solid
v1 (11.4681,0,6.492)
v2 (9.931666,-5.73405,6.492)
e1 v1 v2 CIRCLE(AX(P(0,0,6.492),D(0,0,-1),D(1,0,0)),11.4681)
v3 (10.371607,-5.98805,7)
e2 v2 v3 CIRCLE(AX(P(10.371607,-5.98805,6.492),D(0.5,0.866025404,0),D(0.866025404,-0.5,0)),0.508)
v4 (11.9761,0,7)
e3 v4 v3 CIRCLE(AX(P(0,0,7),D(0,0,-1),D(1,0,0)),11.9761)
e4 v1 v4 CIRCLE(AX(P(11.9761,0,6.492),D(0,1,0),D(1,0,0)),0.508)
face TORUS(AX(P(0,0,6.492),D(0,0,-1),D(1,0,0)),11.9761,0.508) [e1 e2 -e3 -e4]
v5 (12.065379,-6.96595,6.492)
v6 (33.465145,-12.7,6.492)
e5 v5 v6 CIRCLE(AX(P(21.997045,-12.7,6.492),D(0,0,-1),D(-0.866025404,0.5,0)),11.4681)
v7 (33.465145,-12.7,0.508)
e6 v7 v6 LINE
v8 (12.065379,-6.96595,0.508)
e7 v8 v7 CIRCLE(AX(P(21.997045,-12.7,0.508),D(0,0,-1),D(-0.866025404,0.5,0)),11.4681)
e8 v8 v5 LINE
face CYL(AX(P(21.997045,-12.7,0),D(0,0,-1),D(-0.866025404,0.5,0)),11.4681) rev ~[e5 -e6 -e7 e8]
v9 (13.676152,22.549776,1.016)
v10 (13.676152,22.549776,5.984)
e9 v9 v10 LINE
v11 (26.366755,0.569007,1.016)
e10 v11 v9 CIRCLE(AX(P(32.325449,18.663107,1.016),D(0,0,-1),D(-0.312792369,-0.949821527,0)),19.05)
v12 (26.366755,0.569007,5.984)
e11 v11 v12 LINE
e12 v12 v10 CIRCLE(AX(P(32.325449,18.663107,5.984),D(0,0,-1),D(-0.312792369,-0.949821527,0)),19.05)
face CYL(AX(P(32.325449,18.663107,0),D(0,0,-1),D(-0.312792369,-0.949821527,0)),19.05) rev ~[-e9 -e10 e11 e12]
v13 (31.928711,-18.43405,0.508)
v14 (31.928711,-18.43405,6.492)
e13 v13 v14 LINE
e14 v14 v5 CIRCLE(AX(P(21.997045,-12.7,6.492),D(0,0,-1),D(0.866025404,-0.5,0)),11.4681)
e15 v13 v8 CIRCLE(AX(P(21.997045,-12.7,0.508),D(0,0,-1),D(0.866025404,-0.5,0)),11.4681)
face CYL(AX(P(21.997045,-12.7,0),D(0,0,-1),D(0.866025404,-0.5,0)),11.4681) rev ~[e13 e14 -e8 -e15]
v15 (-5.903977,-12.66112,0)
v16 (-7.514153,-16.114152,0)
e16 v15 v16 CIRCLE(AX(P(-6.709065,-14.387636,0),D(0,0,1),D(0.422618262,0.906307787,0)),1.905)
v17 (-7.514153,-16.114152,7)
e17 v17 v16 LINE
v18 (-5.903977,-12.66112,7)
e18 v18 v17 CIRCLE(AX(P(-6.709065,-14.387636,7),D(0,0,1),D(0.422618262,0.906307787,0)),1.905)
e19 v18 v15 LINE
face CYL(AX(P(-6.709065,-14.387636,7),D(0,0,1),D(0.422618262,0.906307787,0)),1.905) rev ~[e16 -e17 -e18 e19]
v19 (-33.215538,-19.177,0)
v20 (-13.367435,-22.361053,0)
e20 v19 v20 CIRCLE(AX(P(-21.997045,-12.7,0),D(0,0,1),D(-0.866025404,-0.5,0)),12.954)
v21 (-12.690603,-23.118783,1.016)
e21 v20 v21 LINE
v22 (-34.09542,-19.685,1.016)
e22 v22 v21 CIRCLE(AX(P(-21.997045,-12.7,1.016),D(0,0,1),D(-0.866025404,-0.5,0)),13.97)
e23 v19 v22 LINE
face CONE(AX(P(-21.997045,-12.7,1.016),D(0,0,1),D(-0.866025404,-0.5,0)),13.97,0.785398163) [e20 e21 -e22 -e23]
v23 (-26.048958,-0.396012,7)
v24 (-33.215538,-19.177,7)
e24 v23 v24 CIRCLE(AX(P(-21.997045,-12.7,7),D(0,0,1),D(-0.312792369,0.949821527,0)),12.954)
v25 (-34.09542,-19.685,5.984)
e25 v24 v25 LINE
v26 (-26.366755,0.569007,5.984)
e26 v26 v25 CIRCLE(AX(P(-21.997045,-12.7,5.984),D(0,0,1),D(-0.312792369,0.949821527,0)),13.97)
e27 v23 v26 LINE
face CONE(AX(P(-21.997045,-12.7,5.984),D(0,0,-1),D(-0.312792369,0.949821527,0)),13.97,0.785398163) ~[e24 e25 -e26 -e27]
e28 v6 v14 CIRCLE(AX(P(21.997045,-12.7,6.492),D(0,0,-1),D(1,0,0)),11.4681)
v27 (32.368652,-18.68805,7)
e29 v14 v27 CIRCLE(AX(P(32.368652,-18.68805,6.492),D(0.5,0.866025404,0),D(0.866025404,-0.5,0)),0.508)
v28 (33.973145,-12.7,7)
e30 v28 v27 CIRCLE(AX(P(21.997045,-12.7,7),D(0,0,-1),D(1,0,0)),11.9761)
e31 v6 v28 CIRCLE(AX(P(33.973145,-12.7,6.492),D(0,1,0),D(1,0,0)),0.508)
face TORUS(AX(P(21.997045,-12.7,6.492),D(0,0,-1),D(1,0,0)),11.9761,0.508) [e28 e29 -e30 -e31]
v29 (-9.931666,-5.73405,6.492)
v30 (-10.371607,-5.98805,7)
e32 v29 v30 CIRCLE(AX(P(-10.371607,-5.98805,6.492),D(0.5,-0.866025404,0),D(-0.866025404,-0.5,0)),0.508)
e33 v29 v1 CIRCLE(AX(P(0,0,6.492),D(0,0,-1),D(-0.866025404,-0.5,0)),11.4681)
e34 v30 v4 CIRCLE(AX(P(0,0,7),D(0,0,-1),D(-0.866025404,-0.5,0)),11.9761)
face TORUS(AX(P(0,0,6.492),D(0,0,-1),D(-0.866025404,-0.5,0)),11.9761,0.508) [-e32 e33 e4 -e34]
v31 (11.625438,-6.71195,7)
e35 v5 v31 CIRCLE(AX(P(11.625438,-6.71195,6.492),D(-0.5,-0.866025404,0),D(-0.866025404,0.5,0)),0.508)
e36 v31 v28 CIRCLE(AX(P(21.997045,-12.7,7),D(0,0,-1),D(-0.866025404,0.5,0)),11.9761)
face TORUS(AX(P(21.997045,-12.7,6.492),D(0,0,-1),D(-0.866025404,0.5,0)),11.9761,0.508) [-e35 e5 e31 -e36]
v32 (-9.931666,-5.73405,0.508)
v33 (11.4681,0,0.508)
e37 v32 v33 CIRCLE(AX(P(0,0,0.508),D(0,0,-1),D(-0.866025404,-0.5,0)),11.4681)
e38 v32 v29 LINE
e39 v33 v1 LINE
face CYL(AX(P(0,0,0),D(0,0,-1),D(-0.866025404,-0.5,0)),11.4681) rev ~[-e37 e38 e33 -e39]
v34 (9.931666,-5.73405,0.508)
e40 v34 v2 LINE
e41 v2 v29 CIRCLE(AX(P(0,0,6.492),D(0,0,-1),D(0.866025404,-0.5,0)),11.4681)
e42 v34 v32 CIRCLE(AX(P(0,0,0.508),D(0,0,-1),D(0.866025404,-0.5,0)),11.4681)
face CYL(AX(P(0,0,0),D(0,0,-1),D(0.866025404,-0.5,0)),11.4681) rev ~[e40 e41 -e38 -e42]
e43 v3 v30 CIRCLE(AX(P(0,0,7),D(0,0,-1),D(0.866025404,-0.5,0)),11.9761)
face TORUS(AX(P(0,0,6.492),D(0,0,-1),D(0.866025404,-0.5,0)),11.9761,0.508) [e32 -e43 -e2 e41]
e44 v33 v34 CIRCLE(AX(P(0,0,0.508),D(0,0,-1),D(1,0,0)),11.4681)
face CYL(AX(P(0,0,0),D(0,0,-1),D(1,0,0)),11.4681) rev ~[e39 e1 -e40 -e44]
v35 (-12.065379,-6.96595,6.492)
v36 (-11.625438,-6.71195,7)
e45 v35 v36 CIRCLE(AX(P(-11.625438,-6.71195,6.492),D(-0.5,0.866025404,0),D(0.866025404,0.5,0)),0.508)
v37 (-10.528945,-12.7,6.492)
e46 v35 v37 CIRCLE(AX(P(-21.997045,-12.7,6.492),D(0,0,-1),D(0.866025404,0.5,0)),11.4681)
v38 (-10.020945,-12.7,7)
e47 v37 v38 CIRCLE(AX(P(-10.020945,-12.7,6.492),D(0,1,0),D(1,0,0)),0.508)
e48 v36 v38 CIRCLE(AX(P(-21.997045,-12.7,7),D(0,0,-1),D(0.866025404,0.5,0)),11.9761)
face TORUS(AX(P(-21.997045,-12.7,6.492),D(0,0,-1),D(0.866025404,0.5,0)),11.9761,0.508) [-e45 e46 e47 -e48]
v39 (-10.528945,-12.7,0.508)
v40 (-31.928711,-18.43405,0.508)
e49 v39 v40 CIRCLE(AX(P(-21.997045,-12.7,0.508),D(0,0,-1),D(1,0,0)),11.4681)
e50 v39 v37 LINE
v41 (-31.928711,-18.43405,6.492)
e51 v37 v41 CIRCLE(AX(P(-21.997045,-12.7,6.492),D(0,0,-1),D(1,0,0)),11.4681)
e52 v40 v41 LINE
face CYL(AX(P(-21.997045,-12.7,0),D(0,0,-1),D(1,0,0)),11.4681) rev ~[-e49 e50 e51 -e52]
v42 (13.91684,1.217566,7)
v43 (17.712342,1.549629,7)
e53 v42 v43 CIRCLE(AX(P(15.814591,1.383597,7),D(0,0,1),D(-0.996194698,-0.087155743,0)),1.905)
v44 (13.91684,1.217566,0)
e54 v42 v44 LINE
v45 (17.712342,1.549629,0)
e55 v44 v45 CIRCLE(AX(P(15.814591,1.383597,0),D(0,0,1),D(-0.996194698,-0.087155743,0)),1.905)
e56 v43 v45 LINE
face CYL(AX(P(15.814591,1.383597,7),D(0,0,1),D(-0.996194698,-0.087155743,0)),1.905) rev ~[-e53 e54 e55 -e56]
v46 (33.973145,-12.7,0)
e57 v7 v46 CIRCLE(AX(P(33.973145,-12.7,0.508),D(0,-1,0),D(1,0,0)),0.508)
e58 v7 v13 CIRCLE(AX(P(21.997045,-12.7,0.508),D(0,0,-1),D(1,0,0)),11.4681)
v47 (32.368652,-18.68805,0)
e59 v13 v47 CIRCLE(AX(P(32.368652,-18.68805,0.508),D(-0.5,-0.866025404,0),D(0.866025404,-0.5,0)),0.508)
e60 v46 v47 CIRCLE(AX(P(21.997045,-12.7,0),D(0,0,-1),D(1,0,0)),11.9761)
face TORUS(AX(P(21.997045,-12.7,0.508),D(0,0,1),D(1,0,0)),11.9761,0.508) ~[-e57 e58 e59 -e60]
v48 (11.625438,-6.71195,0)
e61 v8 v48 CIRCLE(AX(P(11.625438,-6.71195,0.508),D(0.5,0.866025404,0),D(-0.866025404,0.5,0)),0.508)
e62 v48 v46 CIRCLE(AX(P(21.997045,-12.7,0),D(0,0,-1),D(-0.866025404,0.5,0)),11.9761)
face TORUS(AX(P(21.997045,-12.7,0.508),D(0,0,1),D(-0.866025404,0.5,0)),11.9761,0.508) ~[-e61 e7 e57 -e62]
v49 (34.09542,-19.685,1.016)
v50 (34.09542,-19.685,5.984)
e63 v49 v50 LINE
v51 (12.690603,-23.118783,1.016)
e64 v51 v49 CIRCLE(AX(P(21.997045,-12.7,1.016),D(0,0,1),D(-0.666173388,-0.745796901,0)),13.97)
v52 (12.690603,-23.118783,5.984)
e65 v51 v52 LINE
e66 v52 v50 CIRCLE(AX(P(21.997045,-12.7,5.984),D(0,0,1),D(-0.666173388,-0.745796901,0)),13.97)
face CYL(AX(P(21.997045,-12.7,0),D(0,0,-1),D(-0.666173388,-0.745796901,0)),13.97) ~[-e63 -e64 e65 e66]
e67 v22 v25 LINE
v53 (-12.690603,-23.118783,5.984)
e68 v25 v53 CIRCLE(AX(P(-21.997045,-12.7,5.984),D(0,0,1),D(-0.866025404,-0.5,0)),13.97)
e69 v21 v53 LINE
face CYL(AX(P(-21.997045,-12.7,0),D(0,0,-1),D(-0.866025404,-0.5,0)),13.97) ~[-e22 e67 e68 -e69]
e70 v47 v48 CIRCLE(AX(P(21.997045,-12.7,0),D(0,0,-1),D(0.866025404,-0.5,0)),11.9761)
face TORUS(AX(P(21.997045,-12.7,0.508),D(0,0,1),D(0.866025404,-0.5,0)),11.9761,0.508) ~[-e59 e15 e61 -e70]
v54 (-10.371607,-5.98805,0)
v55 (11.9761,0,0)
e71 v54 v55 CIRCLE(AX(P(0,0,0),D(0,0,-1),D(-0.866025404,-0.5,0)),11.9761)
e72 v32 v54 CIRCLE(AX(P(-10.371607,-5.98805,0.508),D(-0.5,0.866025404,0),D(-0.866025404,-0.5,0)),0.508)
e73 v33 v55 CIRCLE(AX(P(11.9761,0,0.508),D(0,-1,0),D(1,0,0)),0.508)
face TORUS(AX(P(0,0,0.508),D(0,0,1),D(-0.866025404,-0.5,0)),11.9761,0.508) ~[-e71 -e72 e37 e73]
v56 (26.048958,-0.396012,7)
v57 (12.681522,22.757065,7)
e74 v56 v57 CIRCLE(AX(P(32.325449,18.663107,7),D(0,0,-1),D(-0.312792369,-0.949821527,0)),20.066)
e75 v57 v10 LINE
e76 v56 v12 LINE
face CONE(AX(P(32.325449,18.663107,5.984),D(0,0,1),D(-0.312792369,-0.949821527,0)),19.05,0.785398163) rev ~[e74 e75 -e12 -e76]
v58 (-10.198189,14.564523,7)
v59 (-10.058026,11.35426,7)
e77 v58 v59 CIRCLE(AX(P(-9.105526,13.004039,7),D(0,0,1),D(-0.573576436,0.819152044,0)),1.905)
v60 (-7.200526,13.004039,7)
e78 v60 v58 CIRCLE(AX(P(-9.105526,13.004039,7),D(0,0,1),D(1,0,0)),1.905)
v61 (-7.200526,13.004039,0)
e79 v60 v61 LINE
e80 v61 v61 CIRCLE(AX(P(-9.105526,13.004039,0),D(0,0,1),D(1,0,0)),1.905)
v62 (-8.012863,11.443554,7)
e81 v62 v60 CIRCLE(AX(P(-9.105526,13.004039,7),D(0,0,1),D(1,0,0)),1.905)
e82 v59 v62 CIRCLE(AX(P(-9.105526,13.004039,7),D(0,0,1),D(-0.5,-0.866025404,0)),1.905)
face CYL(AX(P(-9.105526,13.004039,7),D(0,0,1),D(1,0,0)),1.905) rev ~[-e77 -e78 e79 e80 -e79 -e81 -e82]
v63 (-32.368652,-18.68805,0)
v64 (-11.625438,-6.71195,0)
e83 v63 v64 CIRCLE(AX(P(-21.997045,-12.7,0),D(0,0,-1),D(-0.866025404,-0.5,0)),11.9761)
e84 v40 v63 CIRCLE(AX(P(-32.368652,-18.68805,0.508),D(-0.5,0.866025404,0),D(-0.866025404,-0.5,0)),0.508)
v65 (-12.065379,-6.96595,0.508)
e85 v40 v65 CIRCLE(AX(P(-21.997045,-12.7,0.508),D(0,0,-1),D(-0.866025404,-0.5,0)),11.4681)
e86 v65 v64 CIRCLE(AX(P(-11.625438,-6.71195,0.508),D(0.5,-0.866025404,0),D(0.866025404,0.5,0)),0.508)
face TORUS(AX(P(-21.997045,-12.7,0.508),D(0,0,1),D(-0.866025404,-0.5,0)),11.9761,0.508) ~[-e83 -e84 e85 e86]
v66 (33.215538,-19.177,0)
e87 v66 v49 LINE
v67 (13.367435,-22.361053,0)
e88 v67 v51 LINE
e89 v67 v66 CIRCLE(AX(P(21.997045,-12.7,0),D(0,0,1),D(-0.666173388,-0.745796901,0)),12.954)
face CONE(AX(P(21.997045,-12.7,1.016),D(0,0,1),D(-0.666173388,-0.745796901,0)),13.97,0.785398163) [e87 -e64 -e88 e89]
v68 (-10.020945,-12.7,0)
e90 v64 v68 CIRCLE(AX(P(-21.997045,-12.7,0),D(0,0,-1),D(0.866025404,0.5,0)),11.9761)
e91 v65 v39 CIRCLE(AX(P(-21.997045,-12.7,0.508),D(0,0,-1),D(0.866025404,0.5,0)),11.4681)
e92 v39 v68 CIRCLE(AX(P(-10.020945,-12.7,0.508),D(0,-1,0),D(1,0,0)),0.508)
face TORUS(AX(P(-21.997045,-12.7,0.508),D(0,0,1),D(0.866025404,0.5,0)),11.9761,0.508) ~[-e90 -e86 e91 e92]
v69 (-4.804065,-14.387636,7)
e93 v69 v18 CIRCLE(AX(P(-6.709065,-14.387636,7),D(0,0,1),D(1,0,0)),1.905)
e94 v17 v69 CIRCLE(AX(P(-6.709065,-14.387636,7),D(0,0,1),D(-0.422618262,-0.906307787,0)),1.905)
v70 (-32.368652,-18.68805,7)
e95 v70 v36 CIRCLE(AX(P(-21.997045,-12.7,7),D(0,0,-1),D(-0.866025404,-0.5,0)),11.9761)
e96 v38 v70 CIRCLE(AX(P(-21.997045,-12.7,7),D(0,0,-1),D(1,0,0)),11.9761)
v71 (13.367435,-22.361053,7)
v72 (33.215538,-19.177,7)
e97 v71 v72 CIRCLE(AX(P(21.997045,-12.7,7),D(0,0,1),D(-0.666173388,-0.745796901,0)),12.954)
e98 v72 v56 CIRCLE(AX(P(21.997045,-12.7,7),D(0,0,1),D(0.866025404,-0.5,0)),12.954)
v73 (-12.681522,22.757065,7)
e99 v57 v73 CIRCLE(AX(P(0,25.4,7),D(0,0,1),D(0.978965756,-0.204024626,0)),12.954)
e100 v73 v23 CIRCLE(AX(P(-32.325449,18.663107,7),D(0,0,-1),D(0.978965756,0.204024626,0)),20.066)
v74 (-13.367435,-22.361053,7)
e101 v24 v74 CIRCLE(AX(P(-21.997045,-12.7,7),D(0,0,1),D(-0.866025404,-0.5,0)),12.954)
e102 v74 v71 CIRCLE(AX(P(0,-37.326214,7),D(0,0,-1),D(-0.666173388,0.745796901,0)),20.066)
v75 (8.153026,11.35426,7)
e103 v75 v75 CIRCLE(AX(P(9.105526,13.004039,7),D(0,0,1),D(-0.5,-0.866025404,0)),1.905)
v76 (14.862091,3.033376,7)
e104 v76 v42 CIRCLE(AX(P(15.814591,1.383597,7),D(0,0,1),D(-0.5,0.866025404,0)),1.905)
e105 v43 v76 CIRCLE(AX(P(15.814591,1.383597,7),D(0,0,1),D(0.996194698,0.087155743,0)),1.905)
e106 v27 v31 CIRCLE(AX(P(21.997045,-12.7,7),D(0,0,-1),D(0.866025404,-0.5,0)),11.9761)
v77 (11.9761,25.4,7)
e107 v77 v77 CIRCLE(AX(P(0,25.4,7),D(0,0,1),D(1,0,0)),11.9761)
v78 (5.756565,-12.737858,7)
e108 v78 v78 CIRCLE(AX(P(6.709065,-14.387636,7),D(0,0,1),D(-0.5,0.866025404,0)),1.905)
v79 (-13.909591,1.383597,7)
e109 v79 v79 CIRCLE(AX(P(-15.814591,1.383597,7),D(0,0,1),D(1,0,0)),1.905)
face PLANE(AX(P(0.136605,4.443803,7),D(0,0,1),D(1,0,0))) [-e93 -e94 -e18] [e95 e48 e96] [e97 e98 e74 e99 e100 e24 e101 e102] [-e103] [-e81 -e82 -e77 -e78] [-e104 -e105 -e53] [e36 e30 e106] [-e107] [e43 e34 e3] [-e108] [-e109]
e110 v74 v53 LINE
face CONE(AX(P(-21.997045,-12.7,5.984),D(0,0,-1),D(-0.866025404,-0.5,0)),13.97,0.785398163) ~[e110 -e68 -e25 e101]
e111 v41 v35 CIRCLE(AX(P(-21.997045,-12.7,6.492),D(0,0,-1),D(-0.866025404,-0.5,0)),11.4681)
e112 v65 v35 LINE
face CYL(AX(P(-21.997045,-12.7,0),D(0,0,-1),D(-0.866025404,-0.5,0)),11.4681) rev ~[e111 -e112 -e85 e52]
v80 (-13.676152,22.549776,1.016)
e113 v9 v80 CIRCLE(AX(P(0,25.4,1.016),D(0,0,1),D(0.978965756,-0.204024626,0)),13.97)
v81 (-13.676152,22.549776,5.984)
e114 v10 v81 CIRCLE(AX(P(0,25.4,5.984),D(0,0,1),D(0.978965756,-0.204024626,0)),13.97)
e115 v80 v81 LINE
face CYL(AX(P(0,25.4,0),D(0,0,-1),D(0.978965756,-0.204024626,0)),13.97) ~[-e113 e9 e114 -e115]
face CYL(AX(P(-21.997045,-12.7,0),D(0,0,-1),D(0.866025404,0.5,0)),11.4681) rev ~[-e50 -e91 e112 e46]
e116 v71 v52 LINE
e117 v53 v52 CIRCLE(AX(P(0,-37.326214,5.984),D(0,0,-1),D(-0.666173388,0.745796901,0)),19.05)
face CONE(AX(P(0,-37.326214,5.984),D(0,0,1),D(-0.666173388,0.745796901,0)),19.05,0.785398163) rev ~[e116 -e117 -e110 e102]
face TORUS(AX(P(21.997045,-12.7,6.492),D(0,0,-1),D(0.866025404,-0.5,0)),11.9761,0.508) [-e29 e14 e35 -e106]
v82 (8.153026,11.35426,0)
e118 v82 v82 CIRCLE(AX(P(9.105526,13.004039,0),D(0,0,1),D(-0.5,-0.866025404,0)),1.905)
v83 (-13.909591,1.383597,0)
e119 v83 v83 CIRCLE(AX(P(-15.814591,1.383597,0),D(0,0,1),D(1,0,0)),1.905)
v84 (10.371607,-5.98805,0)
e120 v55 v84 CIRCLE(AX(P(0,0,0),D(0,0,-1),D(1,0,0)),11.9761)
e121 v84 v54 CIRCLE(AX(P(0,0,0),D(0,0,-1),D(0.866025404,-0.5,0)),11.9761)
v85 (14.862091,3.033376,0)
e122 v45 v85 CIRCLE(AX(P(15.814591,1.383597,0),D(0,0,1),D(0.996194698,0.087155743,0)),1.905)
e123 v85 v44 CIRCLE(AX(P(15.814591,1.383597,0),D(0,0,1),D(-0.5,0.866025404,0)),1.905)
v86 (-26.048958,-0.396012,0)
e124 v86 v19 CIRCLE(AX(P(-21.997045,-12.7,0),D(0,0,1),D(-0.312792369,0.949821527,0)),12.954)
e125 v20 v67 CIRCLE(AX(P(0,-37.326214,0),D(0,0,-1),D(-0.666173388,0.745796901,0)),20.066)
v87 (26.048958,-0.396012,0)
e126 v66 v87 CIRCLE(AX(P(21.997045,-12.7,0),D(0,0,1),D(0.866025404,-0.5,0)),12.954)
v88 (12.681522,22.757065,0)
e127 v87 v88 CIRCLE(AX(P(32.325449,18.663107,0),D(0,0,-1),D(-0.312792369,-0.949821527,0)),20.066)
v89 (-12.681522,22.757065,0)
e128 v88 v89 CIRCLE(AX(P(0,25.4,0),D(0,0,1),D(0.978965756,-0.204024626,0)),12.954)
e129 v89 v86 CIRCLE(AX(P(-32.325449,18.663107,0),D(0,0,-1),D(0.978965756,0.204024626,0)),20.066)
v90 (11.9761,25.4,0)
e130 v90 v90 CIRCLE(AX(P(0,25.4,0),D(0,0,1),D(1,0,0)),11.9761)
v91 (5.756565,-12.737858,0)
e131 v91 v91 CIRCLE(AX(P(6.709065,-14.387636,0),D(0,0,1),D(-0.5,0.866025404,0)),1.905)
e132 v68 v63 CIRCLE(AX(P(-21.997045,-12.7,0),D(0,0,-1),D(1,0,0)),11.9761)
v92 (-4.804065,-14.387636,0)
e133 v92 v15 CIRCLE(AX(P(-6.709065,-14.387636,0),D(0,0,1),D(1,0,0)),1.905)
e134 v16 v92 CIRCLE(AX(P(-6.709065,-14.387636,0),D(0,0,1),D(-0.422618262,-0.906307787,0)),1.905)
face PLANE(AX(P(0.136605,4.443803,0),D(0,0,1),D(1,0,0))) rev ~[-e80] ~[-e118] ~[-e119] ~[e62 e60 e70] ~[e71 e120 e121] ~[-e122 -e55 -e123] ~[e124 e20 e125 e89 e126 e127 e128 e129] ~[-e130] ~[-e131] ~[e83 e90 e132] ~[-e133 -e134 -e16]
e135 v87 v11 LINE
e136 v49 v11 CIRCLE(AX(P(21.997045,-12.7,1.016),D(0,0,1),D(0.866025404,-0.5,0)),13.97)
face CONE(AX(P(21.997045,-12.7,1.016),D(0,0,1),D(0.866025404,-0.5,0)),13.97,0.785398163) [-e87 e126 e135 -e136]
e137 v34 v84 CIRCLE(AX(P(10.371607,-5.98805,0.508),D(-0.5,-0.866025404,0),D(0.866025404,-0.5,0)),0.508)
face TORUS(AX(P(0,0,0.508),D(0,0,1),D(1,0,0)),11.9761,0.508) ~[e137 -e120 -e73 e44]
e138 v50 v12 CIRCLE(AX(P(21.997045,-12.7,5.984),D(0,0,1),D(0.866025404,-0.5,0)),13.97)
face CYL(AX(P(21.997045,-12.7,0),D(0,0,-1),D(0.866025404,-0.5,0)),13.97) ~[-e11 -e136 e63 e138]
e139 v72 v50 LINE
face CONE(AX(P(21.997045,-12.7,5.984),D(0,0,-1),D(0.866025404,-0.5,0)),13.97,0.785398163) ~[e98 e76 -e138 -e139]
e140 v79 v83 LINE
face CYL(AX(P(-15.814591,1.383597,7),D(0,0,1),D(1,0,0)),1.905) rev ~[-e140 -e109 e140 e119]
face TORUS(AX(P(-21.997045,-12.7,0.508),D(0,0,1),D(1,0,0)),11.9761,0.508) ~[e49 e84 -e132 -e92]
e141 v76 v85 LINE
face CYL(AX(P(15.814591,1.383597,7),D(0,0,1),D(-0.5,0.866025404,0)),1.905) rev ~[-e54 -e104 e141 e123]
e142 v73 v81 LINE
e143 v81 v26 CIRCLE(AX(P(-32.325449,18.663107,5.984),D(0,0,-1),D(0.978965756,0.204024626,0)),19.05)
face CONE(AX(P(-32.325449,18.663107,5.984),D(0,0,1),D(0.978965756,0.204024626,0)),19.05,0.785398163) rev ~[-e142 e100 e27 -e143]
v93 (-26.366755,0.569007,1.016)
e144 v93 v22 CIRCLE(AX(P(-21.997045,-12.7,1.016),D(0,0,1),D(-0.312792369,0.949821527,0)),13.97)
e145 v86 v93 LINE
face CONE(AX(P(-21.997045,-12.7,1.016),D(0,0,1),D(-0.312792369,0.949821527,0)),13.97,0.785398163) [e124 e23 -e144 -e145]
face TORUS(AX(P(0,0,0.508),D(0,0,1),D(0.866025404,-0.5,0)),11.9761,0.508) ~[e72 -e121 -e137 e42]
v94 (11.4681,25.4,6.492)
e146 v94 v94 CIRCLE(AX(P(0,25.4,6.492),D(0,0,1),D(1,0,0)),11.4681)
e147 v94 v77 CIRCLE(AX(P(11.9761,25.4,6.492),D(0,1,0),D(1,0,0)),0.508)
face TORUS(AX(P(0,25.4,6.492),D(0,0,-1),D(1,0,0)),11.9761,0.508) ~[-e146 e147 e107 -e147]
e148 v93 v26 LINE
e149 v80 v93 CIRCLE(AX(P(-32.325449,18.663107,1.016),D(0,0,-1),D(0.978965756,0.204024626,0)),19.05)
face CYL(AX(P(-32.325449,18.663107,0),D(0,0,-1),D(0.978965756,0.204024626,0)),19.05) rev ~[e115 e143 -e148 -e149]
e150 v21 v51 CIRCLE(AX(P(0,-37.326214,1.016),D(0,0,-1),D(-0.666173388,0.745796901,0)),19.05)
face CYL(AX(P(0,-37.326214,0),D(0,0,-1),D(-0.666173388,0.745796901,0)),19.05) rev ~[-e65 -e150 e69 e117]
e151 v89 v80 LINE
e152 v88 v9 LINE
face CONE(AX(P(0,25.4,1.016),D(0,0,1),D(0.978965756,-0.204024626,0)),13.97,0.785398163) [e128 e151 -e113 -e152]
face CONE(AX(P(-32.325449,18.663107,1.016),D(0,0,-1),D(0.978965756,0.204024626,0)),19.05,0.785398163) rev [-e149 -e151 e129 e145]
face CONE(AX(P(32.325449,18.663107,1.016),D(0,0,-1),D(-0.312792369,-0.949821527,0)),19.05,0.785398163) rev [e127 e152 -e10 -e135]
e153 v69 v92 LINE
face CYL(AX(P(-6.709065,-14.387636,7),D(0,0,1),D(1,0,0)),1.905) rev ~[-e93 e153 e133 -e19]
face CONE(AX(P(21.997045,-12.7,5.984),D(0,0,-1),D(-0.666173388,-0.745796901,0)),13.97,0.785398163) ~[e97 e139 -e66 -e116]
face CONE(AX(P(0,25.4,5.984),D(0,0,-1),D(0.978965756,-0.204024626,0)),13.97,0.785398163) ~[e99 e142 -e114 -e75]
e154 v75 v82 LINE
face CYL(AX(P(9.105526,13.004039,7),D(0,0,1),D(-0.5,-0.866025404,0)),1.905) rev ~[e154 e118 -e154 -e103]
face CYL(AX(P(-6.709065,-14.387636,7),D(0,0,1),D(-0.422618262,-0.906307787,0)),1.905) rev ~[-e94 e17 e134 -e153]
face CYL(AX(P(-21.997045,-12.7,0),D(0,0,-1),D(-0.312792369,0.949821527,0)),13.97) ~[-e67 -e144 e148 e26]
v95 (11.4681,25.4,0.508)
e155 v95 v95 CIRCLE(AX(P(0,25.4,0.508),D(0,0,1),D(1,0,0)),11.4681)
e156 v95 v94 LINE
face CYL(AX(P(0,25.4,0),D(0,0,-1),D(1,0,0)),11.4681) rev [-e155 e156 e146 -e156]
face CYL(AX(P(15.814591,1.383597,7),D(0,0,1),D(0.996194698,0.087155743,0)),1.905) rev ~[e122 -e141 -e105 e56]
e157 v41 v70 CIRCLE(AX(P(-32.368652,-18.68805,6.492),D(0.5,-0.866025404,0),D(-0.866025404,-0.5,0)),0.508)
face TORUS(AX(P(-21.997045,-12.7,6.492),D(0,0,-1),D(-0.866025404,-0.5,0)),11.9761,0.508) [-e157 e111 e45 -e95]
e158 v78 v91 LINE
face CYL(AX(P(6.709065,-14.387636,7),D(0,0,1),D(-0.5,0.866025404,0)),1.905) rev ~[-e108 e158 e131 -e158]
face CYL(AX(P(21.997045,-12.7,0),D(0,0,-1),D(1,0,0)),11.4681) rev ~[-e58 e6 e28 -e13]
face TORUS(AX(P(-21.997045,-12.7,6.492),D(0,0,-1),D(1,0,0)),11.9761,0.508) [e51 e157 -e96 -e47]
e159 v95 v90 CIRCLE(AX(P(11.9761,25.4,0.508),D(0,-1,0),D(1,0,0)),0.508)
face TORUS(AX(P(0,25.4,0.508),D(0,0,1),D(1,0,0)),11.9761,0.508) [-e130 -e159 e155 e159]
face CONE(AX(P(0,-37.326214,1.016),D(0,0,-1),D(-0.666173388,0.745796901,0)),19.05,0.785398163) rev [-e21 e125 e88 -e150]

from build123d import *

# Parameters (mm, degrees)
F0_R            = 11.4681
F1_DEPTH        = 7
F2_R            = 0.508
F3_SIZE         = 1.016
F4_R            = 1.905
F5_DEPTH        = 7.001
F5_COPIES_COUNT = 3


# Not quite as in the source:
# - a pattern or mirror of a feature is missing from the dataset's text; its kind, count and spacing are read off the source's solid


with BuildPart() as f1:
    # F0 (on Top) → F1 (new body)
    with BuildSketch(Plane.XY):
        with BuildLine():
            ThreePointArc((-9.9316659331, -5.73405), (-2.9681626911, 11.0773339685), (11.4681, 0))
            ThreePointArc((11.4681, 0), (11.0773339685, -2.9681626911), (9.9316659331, -5.73405))
            Line((9.9316659331, -5.73405), (12.065379323, -6.96595))
            ThreePointArc((12.065379323, -6.96595), (24.9652079473, -1.6226660315), (33.4651452561, -12.7))
            ThreePointArc((33.4651452561, -12.7), (33.0743792246, -15.6681626911), (31.9287111893, -18.43405))
            Line((31.9287111893, -18.43405), (34.095420147, -19.685))
            ThreePointArc((34.095420147, -19.685), (35.0490813893, -7.7195127971), (26.3667546467, 0.5690067391))
            ThreePointArc((26.3667546467, 0.5690067391), (15.8276653281, 9.1381068378), (13.6761516143, 22.5497759699))
            ThreePointArc((13.6761516143, 22.5497759699), (0, 39.37), (-13.6761516143, 22.5497759699))
            ThreePointArc((-13.6761516143, 22.5497759699), (-15.8276653281, 9.1381068378), (-26.3667546467, 0.5690067391))
            ThreePointArc((-26.3667546467, 0.5690067391), (-35.0490813893, -7.7195127971), (-34.095420147, -19.685))
            Line((-34.095420147, -19.685), (-31.9287111893, -18.43405))
            ThreePointArc((-31.9287111893, -18.43405), (-27.7310952561, -2.7683340669), (-12.065379323, -6.96595))
            Line((-12.065379323, -6.96595), (-9.9316659331, -5.73405))
        make_face()
        with Locations((0, 25.4)):
            Circle(F0_R, mode=Mode.SUBTRACT)
        with BuildLine():
            ThreePointArc((9.9316659331, -5.73405), (0, -11.4681), (-9.9316659331, -5.73405))
            Line((-9.9316659331, -5.73405), (-12.065379323, -6.96595))
            ThreePointArc((-12.065379323, -6.96595), (-10.9197112877, -9.7318373089), (-10.5289452561, -12.7))
            ThreePointArc((-10.5289452561, -12.7), (-19.028882565, -23.7773339685), (-31.9287111893, -18.43405))
            Line((-31.9287111893, -18.43405), (-34.095420147, -19.685))
            ThreePointArc((-34.095420147, -19.685), (-24.2098348818, -26.4936384639), (-12.6906030324, -23.1187827089))
            ThreePointArc((-12.6906030324, -23.1187827089), (0, -18.2762136757), (12.6906030324, -23.1187827089))
            ThreePointArc((12.6906030324, -23.1187827089), (24.2098348818, -26.4936384639), (34.095420147, -19.685))
            Line((34.095420147, -19.685), (31.9287111893, -18.43405))
            ThreePointArc((31.9287111893, -18.43405), (16.2629952561, -22.6316659331), (12.065379323, -6.96595))
            Line((12.065379323, -6.96595), (9.9316659331, -5.73405))
        make_face()
    extrude(amount=F1_DEPTH)

    # F2
    f2_edges = [f1.edges().sort_by_distance(p)[0] for p in [
        (-31.928711, -18.43405, 7),
        (10.528945, -12.7, 7),
        (-11.4681, 25.4, 7),
        (-11.4681, 0, 7),
        (-31.928711, -18.43405, 0),
        (-11.4681, 25.4, 0),
        (-11.4681, 0, 0),
        (10.528945, -12.7, 0),
    ]]
    fillet(f2_edges, radius=F2_R)

    # F3
    f3_edges = [f1.edges().sort_by_distance(p)[0] for p in [
        (-15.827665, 9.138107, 7),
        (-15.827665, 9.138107, 0),
        (15.827665, 9.138107, 0),
        (0, 39.37, 0),
        (-34.09542, -19.685, 0),
        (0, -18.276214, 0),
        (34.09542, -19.685, 0),
        (15.827665, 9.138107, 7),
        (0, 39.37, 7),
        (-34.09542, -19.685, 7),
        (0, -18.276214, 7),
        (34.09542, -19.685, 7),
    ]]
    chamfer(f3_edges, length=F3_SIZE)

    # F4 (on face) → F5 (cut, through all)
    with BuildSketch(Plane.XY.offset(7)):
        with Locations((-9.1055259271, 13.0040387031)):
            Circle(F4_R)
        with Locations((-15.8145908322, 1.3835974161)):
            Circle(F4_R)
        with BuildLine():
            ThreePointArc((-7.5141526937, -16.1141524535), (-5.6855091512, -15.9942968235), (-4.8040649051, -14.3876361192))
            ThreePointArc((-4.8040649051, -14.3876361192), (-5.1024042009, -13.3640803653), (-5.9039771165, -12.6611197849))
            Line((-5.9039771165, -12.6611197849), (-7.5141526937, -16.1141524535))
        make_face()
        with BuildLine():
            Line((-7.5141526937, -16.1141524535), (-5.9039771165, -12.6611197849))
            ThreePointArc((-5.9039771165, -12.6611197849), (-8.4355812394, -13.5825483306), (-7.5141526937, -16.1141524535))
        make_face()
    f5 = extrude(amount=-F5_DEPTH, mode=Mode.SUBTRACT)

    # F5_copies: F5 ×3 about axis
    f5_copies_axis = Axis((0, 0, 0), (0, 0, 1))
    for i in range(1, F5_COPIES_COUNT):
        add(f5.rotate(f5_copies_axis, i * 360 / F5_COPIES_COUNT), mode=Mode.SUBTRACT)


solid = f1.part
